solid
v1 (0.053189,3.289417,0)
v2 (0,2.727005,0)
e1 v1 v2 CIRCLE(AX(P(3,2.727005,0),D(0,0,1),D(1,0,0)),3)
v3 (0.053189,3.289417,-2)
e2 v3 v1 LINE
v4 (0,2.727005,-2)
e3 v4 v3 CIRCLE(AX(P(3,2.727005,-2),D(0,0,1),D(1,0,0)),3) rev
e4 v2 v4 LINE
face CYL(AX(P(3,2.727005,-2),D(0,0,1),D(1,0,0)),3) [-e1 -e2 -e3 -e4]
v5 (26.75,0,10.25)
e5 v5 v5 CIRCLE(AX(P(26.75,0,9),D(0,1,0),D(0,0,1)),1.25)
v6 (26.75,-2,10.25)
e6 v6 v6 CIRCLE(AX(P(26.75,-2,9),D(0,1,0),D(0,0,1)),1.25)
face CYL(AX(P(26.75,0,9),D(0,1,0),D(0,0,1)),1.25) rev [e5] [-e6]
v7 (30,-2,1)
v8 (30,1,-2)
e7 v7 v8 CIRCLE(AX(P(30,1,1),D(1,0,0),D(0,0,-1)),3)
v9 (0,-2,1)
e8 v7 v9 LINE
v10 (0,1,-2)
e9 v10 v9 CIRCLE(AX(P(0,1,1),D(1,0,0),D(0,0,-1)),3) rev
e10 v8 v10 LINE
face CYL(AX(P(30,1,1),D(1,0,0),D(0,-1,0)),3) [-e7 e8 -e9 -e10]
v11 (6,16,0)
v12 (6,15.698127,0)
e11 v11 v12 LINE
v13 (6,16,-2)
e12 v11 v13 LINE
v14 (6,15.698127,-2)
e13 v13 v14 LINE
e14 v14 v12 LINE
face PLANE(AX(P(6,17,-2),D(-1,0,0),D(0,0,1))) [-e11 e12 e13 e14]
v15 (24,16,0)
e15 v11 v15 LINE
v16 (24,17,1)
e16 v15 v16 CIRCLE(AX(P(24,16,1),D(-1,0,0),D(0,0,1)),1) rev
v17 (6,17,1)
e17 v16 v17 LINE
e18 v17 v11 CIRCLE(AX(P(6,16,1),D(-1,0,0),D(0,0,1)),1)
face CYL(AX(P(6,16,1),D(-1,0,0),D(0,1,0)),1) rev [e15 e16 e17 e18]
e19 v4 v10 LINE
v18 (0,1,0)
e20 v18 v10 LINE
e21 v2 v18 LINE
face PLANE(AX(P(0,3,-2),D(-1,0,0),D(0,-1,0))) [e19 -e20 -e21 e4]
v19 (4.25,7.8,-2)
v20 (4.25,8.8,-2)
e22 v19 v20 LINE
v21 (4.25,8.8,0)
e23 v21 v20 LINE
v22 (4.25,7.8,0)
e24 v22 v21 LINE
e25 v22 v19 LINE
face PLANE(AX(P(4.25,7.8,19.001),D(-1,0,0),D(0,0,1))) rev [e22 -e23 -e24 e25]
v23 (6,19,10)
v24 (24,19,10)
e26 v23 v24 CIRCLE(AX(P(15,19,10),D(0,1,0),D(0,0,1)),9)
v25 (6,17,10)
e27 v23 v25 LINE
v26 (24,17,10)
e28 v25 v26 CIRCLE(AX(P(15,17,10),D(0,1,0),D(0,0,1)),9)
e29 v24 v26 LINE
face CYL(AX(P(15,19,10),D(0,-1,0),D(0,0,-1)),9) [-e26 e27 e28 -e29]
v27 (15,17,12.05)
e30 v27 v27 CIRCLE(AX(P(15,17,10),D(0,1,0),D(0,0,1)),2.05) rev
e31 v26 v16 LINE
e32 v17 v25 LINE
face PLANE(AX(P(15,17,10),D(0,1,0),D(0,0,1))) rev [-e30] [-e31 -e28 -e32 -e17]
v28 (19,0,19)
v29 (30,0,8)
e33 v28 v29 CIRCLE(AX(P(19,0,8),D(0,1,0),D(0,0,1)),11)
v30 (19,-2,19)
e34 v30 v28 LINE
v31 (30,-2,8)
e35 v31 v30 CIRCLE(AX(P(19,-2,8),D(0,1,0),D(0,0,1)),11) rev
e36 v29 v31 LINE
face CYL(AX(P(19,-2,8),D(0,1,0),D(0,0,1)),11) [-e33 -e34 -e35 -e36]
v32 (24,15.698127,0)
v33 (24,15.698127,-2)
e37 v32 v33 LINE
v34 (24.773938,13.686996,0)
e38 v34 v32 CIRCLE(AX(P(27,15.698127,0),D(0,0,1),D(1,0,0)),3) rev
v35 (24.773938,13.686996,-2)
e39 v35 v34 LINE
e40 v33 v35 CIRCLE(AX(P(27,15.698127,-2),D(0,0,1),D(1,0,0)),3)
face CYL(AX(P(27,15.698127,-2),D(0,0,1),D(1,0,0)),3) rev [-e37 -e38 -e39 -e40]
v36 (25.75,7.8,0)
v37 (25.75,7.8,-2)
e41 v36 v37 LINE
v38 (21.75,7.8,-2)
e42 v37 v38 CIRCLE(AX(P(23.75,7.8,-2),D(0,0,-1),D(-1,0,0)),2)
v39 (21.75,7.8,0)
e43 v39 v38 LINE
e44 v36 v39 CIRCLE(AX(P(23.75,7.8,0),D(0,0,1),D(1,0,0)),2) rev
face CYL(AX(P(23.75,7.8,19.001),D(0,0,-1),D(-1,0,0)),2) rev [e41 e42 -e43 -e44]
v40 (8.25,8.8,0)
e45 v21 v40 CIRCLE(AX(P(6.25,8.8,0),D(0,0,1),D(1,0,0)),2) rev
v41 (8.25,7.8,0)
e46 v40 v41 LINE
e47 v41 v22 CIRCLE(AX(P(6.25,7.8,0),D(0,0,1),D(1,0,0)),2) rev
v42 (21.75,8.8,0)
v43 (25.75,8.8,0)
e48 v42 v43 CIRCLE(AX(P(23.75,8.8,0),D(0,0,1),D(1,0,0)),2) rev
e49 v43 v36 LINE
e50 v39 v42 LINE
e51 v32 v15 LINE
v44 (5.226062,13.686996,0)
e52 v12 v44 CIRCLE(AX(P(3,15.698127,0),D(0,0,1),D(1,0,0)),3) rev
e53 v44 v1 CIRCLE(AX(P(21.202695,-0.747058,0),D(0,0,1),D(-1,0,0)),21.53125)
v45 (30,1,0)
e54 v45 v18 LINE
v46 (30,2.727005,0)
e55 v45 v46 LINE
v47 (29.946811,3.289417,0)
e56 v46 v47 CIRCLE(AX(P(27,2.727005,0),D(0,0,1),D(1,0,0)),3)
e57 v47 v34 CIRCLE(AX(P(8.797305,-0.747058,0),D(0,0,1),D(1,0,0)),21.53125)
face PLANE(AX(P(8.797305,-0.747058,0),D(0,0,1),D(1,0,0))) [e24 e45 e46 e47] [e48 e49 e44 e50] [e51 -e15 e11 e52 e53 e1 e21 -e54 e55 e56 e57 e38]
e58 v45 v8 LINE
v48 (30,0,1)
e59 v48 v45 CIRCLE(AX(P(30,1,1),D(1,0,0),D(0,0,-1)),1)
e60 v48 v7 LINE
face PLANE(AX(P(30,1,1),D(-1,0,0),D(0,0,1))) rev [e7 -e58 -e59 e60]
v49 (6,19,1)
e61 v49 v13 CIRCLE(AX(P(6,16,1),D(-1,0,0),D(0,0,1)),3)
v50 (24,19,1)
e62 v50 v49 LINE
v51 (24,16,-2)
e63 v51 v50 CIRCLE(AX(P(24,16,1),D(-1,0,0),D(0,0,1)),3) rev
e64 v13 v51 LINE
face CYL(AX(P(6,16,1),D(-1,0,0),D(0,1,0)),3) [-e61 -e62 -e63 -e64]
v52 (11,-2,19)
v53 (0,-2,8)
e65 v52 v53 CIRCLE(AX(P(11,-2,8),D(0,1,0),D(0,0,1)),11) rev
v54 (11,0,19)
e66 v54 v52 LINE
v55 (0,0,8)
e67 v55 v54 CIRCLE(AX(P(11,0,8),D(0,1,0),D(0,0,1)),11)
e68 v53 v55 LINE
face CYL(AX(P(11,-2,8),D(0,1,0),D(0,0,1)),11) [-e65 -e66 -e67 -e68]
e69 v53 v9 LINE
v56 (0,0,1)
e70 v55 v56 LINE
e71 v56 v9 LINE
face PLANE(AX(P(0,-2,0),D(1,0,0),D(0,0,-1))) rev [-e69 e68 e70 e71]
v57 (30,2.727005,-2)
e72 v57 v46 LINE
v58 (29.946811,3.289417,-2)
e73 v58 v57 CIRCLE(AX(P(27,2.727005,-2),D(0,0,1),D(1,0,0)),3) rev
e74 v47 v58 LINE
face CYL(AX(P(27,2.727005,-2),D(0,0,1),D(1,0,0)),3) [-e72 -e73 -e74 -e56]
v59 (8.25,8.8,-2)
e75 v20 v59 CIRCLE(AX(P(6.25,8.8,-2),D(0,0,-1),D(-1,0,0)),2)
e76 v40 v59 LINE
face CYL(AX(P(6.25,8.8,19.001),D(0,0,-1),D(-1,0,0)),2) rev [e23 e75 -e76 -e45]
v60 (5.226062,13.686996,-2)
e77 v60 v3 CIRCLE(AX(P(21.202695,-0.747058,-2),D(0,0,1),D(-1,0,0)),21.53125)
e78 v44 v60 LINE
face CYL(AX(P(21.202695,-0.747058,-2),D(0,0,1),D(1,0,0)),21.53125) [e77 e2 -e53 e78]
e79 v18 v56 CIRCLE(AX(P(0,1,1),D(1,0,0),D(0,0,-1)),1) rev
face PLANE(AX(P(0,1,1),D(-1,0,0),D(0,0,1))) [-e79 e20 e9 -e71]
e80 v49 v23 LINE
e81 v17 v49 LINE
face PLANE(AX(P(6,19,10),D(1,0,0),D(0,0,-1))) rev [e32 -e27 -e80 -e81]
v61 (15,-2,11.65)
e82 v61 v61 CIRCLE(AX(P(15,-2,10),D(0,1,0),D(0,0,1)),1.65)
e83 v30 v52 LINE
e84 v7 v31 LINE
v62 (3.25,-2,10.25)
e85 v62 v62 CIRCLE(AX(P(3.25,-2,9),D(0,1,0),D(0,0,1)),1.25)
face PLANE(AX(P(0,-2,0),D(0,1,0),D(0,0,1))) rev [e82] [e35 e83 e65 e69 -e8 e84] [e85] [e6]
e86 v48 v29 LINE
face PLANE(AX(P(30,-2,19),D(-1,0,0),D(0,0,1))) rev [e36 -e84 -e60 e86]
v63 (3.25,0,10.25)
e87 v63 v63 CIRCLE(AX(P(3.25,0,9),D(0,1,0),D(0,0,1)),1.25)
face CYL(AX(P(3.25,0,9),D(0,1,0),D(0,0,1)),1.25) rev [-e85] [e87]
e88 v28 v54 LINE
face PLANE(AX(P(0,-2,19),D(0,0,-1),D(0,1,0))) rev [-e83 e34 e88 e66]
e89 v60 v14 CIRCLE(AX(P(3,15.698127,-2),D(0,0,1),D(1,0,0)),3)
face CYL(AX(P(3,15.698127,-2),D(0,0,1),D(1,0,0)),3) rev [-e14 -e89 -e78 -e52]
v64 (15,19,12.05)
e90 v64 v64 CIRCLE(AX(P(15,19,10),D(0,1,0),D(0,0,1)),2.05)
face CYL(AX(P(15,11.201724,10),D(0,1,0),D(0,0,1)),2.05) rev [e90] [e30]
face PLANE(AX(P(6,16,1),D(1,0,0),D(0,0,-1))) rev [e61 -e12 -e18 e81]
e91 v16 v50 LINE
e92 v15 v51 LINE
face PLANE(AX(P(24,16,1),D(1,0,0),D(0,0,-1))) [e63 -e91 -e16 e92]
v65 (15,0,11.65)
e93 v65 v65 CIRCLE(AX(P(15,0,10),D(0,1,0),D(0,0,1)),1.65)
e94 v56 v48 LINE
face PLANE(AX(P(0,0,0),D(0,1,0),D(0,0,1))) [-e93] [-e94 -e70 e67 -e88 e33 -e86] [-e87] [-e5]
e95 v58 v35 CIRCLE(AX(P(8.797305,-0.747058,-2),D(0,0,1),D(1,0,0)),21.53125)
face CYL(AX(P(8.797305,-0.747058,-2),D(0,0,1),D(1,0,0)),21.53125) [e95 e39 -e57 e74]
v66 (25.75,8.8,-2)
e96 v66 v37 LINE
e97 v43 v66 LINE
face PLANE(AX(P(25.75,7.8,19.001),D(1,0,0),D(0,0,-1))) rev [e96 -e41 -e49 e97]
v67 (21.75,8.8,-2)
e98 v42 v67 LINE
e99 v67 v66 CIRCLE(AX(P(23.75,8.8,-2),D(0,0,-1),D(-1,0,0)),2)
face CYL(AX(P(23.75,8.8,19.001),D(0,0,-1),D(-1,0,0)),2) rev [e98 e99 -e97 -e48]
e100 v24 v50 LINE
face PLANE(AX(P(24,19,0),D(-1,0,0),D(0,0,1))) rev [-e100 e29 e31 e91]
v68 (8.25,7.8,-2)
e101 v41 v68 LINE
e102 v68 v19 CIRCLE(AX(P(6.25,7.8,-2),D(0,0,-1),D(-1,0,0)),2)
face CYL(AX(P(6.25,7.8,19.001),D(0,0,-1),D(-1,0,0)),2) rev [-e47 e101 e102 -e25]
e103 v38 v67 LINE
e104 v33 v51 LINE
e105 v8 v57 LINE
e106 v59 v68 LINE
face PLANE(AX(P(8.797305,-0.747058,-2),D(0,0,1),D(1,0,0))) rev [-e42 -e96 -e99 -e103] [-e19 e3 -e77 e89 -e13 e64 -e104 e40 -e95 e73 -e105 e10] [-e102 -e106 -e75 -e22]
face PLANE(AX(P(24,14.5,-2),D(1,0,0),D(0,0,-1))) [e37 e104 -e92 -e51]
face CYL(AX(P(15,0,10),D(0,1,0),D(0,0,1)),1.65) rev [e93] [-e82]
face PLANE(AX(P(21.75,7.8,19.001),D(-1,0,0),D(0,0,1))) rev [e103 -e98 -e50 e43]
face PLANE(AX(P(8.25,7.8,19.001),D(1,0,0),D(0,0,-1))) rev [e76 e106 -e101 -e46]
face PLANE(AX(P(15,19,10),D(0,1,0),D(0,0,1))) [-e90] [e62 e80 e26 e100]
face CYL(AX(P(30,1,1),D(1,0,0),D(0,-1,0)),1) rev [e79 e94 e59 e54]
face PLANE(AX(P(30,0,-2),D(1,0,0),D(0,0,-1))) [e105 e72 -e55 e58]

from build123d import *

# Parameters (mm, degrees)
BRIDA_BASE1_DEPTH                = 2
REDONDEO3MM_R                    = 3
BRIDA_DE_ARISTA1_STRIP_W         = 10
BRIDA_DE_ARISTA1_STRIP_H         = 2
BRIDA_DE_ARISTA1_STRIP_CUT_DEPTH = 30
BRIDA_DE_ARISTA1_DEPTH           = 30
BRIDA_DE_ARISTA2_STRIP_W         = 10
BRIDA_DE_ARISTA2_STRIP_H         = 2
BRIDA_DE_ARISTA2_STRIP_CUT_DEPTH = 18
BRIDA_DE_ARISTA2_DEPTH           = 18
BRIDA_START                      = 2
BRIDA_DE_ARISTA2_FLAT_DEPTH      = 2
CORTAR_EXTRUIR6_REACH            = 43.255
REDONDEO11MM_R                   = 11
TALADRO_ROSCADO_M32_D            = 2.5
TALADRO_ROSCADO_M32_DEPTH        = 20.65
TALADRO_ROSCADO_M32_TIP          = 0.751075774
CROQUIS41_R                      = 2.05
CORTAR_EXTRUIR9_DEPTH            = 2
TALADRO_ROSCADO_M41_D            = 3.3


# Sheet-metal steps are written as plain solids
with BuildPart() as part:
    # Croquis1 → Brida base1 (new body)
    with BuildSketch(Plane.XY):
        with BuildLine():
            Line((0, 0), (30, 0))
            Line((30, 0), (30, 3))
            ThreePointArc((30, 3), (27.886584846, 9.212566007), (24, 14.5))
            Line((24, 14.5), (24, 17))
            Line((24, 17), (6, 17))
            Line((6, 17), (6, 14.5))
            ThreePointArc((6, 14.5), (2.113415154, 9.212566007), (0, 3))
            Line((0, 3), (0, 0))
        make_face()
    extrude(amount=-BRIDA_BASE1_DEPTH)

    # Redondeo3mm
    redondeo3mm_edges = [part.edges().sort_by_distance(p)[0] for p in [
        (0, 3, -1),
        (6, 14.5, -1),
        (24, 14.5, -1),
        (30, 3, -1),
    ]]
    fillet(redondeo3mm_edges, radius=REDONDEO3MM_R)

    # Brida de arista1 strip (across the edge) → Brida de arista1 strip cut (cut)
    with BuildSketch(Plane.YZ):
        with Locations((-4, -1)):
            Rectangle(BRIDA_DE_ARISTA1_STRIP_W, BRIDA_DE_ARISTA1_STRIP_H)
    extrude(amount=BRIDA_DE_ARISTA1_STRIP_CUT_DEPTH, mode=Mode.SUBTRACT)

    # Brida de arista1 section (across the edge) → Brida de arista1 (add)
    with BuildSketch(Plane.YZ):
        with BuildLine():
            Line((-2, 1), (-2, 19))
            Line((-2, 19), (0, 19))
            Line((0, 19), (0, 1))
            ThreePointArc((0, 1), (0.292893219, 0.292893219), (1, 0))
            Line((1, 0), (1, -2))
            ThreePointArc((1, -2), (-1.121320344, -1.121320344), (-2, 1))
        make_face()
    extrude(amount=BRIDA_DE_ARISTA1_DEPTH)

    # Brida de arista2 strip (across the edge) → Brida de arista2 strip cut (cut)
    with BuildSketch(Plane(origin=(24, 17, 0), x_dir=(0, -1, 0), z_dir=(-1, 0, 0))):
        with Locations((-4, -1)):
            Rectangle(BRIDA_DE_ARISTA2_STRIP_W, BRIDA_DE_ARISTA2_STRIP_H)
    extrude(amount=BRIDA_DE_ARISTA2_STRIP_CUT_DEPTH, mode=Mode.SUBTRACT)

    # Brida de arista2 bend section (across the edge) → Brida de arista2 (add)
    with BuildSketch(Plane(origin=(24, 17, 0), x_dir=(0, -1, 0), z_dir=(-1, 0, 0))):
        with BuildLine():
            Line((-2, 1), (0, 1))
            ThreePointArc((0, 1), (0.292893219, 0.292893219), (1, 0))
            Line((1, 0), (1, -2))
            ThreePointArc((1, -2), (-1.121320344, -1.121320344), (-2, 1))
        make_face()
    extrude(amount=BRIDA_DE_ARISTA2_DEPTH)

    # Brida de arista2 profile (on flange) → Brida de arista2 flat (add)
    with BuildSketch(Plane(origin=(0, 17, 0), x_dir=(-1, 0, 0), z_dir=(0, 1, 0)).offset(BRIDA_START)):
        with BuildLine():
            ThreePointArc((-6, 10), (-15, 19), (-24, 10))
            Line((-24, 10), (-24, 1))
            Line((-24, 1), (-6, 1))
            Line((-6, 1), (-6, 10))
        make_face()
    extrude(amount=-BRIDA_DE_ARISTA2_FLAT_DEPTH)

    # Croquis26 → Cortar-Extruir6 (cut, up to next)
    with BuildSketch(Plane(origin=(0, 0, -2), x_dir=(-1, 0, 0), z_dir=(0, 0, -1)), mode=Mode.PRIVATE) as cortar_extruir6_sk1:
        with BuildLine():
            Line((-8.25, 7.8), (-8.25, 8.8))
            ThreePointArc((-8.25, 8.8), (-6.25, 10.8), (-4.25, 8.8))
            Line((-4.25, 8.8), (-4.25, 7.8))
            ThreePointArc((-4.25, 7.8), (-6.25, 5.8), (-8.25, 7.8))
        make_face()
    cortar_extruir6_tool1 = extrude(cortar_extruir6_sk1.sketch, amount=-CORTAR_EXTRUIR6_REACH, mode=Mode.PRIVATE) & part.part
    # Croquis26 → Cortar-Extruir6 (cut, up to next)
    with BuildSketch(Plane(origin=(0, 0, -2), x_dir=(-1, 0, 0), z_dir=(0, 0, -1)), mode=Mode.PRIVATE) as cortar_extruir6_sk2:
        with BuildLine():
            Line((-25.75, 7.8), (-25.75, 8.8))
            ThreePointArc((-25.75, 8.8), (-23.75, 10.8), (-21.75, 8.8))
            Line((-21.75, 8.8), (-21.75, 7.8))
            ThreePointArc((-21.75, 7.8), (-23.75, 5.8), (-25.75, 7.8))
        make_face()
    cortar_extruir6_tool2 = extrude(cortar_extruir6_sk2.sketch, amount=-CORTAR_EXTRUIR6_REACH, mode=Mode.PRIVATE) & part.part
    add(cortar_extruir6_tool1.solids().sort_by_distance((6.25, 8.3, -2))[0], mode=Mode.SUBTRACT)
    add(cortar_extruir6_tool2.solids().sort_by_distance((23.75, 8.3, -2))[0], mode=Mode.SUBTRACT)

    # Redondeo11mm
    redondeo11mm_edges = [part.edges().sort_by_distance(p)[0] for p in [
        (0, -1, 19),
        (30, -1, 19),
    ]]
    fillet(redondeo11mm_edges, radius=REDONDEO11MM_R)

    # Taladro roscado M32
    with Locations(Plane(origin=(0, 0, 0), x_dir=(1, 0, 0), z_dir=(0, 1, 0))):
        with Locations((3.25, -9), (26.75, -9)):
            Hole(TALADRO_ROSCADO_M32_D / 2, depth=TALADRO_ROSCADO_M32_DEPTH)
            with Locations((0, 0, -(TALADRO_ROSCADO_M32_DEPTH + TALADRO_ROSCADO_M32_TIP / 2))):  # 118° drill point
                Cone(0, TALADRO_ROSCADO_M32_D / 2, TALADRO_ROSCADO_M32_TIP, mode=Mode.SUBTRACT)

    # Croquis41 → Cortar-Extruir9 (cut)
    with BuildSketch(Plane(origin=(0, 19, 0), x_dir=(1, 0, 0), z_dir=(0, 1, 0))):
        with Locations(Location((15, -10, 0), (0, 0, 270))):
            Circle(CROQUIS41_R)
    extrude(amount=-CORTAR_EXTRUIR9_DEPTH, mode=Mode.SUBTRACT)

    # Taladro roscado M41 (through all)
    with Locations(Plane(origin=(15, 0, 10), x_dir=(0, 0, 1), z_dir=(0, 1, 0))):
        with Locations((0, 0)):
            Hole(TALADRO_ROSCADO_M41_D / 2)


solid = part.part
